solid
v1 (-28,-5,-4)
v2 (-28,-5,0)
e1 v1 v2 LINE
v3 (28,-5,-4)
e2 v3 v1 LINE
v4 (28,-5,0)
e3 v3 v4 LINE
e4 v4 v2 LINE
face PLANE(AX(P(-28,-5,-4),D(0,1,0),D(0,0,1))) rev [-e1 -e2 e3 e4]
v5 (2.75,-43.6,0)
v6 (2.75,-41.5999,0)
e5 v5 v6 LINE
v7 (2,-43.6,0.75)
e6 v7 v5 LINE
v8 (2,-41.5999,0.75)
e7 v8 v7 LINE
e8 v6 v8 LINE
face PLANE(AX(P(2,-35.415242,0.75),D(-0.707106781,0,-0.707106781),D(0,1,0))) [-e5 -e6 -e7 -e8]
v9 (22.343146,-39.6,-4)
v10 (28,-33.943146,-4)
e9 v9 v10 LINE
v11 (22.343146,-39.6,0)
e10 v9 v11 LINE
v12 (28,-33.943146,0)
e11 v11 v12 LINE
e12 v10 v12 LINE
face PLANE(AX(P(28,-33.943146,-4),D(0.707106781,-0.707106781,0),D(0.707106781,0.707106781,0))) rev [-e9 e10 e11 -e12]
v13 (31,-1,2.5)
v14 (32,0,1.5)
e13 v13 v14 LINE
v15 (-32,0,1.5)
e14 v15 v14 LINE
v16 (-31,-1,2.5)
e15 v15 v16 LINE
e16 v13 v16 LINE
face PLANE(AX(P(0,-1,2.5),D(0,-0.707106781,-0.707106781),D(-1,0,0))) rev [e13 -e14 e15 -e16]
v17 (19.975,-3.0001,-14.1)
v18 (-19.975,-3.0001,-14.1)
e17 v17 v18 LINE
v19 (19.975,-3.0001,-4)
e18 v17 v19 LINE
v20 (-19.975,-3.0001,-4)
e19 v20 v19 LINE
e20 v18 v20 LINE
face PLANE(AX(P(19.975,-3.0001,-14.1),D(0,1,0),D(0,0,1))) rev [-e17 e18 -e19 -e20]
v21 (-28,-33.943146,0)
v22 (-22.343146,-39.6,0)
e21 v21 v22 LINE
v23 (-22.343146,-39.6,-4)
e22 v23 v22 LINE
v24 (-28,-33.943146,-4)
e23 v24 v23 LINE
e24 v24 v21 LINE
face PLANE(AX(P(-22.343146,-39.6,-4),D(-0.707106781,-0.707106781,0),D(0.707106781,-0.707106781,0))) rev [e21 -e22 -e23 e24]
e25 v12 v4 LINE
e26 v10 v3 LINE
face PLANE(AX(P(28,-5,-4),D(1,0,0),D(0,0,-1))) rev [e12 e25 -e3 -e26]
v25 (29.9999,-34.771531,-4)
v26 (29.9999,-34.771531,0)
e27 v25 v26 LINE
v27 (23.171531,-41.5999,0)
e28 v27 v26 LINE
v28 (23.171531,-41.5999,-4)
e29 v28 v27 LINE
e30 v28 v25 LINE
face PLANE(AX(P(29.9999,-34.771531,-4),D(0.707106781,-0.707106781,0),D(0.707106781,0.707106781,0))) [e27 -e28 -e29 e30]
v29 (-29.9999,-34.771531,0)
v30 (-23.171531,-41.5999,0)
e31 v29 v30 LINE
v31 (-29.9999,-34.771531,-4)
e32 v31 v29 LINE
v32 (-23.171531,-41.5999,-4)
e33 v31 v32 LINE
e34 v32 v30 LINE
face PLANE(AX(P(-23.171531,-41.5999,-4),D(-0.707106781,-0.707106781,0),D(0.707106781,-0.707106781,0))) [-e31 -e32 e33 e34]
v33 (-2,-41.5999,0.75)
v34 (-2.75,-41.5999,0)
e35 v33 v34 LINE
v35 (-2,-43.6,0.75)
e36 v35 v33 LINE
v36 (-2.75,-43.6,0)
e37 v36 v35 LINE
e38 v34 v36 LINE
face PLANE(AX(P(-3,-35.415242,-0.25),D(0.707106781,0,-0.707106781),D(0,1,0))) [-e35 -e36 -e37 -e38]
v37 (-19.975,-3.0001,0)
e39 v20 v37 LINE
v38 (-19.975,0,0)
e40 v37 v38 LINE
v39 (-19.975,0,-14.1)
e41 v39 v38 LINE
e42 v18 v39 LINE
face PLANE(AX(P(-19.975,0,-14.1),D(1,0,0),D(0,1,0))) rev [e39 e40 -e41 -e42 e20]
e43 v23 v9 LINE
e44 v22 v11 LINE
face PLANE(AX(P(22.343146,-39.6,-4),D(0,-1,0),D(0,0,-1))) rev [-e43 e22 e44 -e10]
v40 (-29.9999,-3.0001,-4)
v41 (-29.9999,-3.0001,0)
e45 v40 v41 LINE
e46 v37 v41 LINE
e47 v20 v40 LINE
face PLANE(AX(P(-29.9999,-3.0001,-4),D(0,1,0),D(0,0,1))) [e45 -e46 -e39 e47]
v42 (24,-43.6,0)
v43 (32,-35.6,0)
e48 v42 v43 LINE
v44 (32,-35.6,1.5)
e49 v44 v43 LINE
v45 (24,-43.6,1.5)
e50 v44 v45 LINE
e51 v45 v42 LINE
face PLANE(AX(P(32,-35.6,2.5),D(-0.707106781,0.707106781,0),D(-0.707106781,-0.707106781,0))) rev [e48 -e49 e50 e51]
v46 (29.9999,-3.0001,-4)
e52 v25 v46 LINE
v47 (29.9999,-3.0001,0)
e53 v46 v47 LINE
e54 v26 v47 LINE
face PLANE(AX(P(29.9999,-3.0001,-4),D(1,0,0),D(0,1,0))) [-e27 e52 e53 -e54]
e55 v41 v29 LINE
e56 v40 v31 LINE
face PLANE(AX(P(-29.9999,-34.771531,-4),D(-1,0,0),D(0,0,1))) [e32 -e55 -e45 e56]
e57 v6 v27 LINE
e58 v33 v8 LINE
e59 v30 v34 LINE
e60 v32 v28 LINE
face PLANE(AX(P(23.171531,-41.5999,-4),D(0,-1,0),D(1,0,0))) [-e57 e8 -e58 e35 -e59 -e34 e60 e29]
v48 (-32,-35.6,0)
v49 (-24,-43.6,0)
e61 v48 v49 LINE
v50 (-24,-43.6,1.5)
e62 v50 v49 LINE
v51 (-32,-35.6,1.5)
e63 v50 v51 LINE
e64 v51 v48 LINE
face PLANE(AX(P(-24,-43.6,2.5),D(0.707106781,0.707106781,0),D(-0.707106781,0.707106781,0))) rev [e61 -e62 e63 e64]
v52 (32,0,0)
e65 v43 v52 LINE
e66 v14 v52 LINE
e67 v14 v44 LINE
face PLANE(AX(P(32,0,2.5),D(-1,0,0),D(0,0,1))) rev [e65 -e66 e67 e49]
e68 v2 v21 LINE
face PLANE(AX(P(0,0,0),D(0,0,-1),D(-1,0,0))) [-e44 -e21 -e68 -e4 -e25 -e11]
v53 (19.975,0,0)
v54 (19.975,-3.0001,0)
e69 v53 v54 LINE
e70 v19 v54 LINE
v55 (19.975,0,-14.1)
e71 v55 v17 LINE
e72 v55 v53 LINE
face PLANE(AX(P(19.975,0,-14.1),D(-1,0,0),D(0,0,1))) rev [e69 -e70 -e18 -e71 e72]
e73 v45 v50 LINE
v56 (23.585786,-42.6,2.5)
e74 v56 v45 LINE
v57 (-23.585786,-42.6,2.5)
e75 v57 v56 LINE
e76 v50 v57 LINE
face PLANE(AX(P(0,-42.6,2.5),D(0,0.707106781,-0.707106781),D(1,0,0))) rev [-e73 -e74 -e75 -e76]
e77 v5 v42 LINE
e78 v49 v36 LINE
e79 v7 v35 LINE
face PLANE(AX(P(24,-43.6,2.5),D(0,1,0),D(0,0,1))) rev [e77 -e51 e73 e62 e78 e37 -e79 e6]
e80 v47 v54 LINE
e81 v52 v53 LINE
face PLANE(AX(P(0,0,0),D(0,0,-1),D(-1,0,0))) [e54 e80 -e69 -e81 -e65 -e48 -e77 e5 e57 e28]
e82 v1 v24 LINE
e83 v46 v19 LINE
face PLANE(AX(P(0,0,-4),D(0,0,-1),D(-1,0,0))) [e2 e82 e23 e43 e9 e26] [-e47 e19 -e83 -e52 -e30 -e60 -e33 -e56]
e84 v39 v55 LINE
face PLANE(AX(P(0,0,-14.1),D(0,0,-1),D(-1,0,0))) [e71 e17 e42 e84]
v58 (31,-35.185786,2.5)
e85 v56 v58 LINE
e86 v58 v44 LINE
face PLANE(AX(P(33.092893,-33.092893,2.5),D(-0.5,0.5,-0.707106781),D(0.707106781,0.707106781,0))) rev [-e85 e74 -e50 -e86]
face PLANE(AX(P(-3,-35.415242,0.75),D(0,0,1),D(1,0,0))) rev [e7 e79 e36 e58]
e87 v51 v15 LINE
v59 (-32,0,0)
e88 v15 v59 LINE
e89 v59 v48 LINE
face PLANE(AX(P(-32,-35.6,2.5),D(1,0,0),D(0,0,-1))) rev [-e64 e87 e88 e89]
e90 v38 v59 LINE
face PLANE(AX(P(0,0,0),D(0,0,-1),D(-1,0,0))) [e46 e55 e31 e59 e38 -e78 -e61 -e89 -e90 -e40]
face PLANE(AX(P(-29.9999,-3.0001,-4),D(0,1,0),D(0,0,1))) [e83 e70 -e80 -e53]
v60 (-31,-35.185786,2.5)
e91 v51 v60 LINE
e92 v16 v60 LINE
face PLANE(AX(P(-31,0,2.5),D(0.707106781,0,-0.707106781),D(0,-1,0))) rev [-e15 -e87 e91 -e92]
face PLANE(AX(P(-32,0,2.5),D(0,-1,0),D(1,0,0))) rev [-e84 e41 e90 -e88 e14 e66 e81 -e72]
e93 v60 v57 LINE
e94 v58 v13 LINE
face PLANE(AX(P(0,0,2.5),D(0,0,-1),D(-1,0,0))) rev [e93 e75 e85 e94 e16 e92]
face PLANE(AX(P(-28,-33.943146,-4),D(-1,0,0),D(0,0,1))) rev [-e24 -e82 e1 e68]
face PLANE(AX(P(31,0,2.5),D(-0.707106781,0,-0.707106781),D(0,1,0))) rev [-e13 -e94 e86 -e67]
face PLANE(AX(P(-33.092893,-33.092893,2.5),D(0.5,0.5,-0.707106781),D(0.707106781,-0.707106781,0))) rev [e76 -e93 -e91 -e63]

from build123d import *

# Parameters (mm, degrees)
BOSS_EXTRUDE1_DEPTH = 4
BOSS_EXTRUDE2_DEPTH = 2.5
CHAMFER1_SIZE       = 1
SKETCH4_W           = 6
SKETCH4_H           = 1.5
CUT_EXTRUDE1_DEPTH  = 2.0001
CHAMFER2_SIZE       = 1
SKETCH5_W           = 39.95
SKETCH5_H           = 3.0001
BOSS_EXTRUDE3_DEPTH = 14.1


with BuildPart() as part:
    # Sketch2 → Boss-Extrude1 (new body)
    with BuildSketch(Plane.XY):
        Polygon((-29.9999, -3.0001), (29.9999, -3.0001), (29.9999, -34.771531454), (23.171531454, -41.5999), (-23.171531454, -41.5999), (-29.9999, -34.771531454), align=None)
        Polygon((-28, -33.943145751), (-28, -5), (28, -5), (28, -33.943145751), (22.343145751, -39.6), (-22.343145751, -39.6), align=None, mode=Mode.SUBTRACT)
    extrude(amount=-BOSS_EXTRUDE1_DEPTH)

    # Sketch3 → Boss-Extrude2 (add)
    with BuildSketch(Plane.XY):
        Polygon((-32, 0), (32, 0), (32, -35.6), (24, -43.6), (-24, -43.6), (-32, -35.6), align=None)
    extrude(amount=BOSS_EXTRUDE2_DEPTH)

    # Chamfer1
    chamfer1_edges = [part.edges().sort_by_distance(p)[0] for p in [
        (-32, -17.8, 2.5),
        (-28, -39.6, 2.5),
        (0, -43.6, 2.5),
        (28, -39.6, 2.5),
        (32, -17.8, 2.5),
        (0, 0, 2.5),
    ]]
    chamfer(chamfer1_edges, length=CHAMFER1_SIZE)

    # Sketch4 → Cut-Extrude1 (cut)
    with BuildSketch(Plane.XZ.offset(43.6)):
        Rectangle(SKETCH4_W, SKETCH4_H)
    extrude(amount=-CUT_EXTRUDE1_DEPTH, mode=Mode.SUBTRACT)

    # Chamfer2
    # the kernel refuses this chamfer: 1 mm, written as the material it adds along each edge
    with BuildSketch(Plane(origin=(3, -43.6, 0.75), x_dir=(0.027495876610586487, 0, -0.9996219169112968), z_dir=(0, 1, 0))) as chamfer2_piece_1_section:
        Polygon((CHAMFER2_SIZE * 0.999621916911, CHAMFER2_SIZE * 0.0274958766106), (-CHAMFER2_SIZE * 0.0274958766106, CHAMFER2_SIZE * 0.999621916911), (0, 0), align=None)
    chamfer2_piece_1 = extrude(amount=4.571782988, mode=Mode.PRIVATE)
    chamfer2_piece_1 = split(chamfer2_piece_1, bisect_by=Plane(origin=(2.65, -42.59995, 0), z_dir=(0, 0, 1)), keep=Keep.TOP, mode=Mode.PRIVATE)
    add(chamfer2_piece_1)
    with BuildSketch(Plane(origin=(-3, -43.6, 0.75), x_dir=(-0.027495876610586487, 0, -0.9996219169112968), z_dir=(0, 1, 0))) as chamfer2_piece_2_section:
        Polygon((CHAMFER2_SIZE * 0.999621916911, -CHAMFER2_SIZE * 0.0274958766106), (-CHAMFER2_SIZE * 0.0274958766106, -CHAMFER2_SIZE * 0.999621916911), (0, 0), align=None)
    chamfer2_piece_2 = extrude(amount=4.571782988, mode=Mode.PRIVATE)
    chamfer2_piece_2 = split(chamfer2_piece_2, bisect_by=Plane(origin=(-2.65, -42.59995, 0), z_dir=(0, 0, 1)), keep=Keep.TOP, mode=Mode.PRIVATE)
    add(chamfer2_piece_2)

    # Sketch5 → Boss-Extrude3 (add)
    with BuildSketch(Plane(origin=(0, 0, 0), x_dir=(-1, 0, 0), z_dir=(0, 0, -1))):
        with Locations((0, -1.50005)):
            Rectangle(SKETCH5_W, SKETCH5_H)
    extrude(amount=BOSS_EXTRUDE3_DEPTH)


solid = part.part
